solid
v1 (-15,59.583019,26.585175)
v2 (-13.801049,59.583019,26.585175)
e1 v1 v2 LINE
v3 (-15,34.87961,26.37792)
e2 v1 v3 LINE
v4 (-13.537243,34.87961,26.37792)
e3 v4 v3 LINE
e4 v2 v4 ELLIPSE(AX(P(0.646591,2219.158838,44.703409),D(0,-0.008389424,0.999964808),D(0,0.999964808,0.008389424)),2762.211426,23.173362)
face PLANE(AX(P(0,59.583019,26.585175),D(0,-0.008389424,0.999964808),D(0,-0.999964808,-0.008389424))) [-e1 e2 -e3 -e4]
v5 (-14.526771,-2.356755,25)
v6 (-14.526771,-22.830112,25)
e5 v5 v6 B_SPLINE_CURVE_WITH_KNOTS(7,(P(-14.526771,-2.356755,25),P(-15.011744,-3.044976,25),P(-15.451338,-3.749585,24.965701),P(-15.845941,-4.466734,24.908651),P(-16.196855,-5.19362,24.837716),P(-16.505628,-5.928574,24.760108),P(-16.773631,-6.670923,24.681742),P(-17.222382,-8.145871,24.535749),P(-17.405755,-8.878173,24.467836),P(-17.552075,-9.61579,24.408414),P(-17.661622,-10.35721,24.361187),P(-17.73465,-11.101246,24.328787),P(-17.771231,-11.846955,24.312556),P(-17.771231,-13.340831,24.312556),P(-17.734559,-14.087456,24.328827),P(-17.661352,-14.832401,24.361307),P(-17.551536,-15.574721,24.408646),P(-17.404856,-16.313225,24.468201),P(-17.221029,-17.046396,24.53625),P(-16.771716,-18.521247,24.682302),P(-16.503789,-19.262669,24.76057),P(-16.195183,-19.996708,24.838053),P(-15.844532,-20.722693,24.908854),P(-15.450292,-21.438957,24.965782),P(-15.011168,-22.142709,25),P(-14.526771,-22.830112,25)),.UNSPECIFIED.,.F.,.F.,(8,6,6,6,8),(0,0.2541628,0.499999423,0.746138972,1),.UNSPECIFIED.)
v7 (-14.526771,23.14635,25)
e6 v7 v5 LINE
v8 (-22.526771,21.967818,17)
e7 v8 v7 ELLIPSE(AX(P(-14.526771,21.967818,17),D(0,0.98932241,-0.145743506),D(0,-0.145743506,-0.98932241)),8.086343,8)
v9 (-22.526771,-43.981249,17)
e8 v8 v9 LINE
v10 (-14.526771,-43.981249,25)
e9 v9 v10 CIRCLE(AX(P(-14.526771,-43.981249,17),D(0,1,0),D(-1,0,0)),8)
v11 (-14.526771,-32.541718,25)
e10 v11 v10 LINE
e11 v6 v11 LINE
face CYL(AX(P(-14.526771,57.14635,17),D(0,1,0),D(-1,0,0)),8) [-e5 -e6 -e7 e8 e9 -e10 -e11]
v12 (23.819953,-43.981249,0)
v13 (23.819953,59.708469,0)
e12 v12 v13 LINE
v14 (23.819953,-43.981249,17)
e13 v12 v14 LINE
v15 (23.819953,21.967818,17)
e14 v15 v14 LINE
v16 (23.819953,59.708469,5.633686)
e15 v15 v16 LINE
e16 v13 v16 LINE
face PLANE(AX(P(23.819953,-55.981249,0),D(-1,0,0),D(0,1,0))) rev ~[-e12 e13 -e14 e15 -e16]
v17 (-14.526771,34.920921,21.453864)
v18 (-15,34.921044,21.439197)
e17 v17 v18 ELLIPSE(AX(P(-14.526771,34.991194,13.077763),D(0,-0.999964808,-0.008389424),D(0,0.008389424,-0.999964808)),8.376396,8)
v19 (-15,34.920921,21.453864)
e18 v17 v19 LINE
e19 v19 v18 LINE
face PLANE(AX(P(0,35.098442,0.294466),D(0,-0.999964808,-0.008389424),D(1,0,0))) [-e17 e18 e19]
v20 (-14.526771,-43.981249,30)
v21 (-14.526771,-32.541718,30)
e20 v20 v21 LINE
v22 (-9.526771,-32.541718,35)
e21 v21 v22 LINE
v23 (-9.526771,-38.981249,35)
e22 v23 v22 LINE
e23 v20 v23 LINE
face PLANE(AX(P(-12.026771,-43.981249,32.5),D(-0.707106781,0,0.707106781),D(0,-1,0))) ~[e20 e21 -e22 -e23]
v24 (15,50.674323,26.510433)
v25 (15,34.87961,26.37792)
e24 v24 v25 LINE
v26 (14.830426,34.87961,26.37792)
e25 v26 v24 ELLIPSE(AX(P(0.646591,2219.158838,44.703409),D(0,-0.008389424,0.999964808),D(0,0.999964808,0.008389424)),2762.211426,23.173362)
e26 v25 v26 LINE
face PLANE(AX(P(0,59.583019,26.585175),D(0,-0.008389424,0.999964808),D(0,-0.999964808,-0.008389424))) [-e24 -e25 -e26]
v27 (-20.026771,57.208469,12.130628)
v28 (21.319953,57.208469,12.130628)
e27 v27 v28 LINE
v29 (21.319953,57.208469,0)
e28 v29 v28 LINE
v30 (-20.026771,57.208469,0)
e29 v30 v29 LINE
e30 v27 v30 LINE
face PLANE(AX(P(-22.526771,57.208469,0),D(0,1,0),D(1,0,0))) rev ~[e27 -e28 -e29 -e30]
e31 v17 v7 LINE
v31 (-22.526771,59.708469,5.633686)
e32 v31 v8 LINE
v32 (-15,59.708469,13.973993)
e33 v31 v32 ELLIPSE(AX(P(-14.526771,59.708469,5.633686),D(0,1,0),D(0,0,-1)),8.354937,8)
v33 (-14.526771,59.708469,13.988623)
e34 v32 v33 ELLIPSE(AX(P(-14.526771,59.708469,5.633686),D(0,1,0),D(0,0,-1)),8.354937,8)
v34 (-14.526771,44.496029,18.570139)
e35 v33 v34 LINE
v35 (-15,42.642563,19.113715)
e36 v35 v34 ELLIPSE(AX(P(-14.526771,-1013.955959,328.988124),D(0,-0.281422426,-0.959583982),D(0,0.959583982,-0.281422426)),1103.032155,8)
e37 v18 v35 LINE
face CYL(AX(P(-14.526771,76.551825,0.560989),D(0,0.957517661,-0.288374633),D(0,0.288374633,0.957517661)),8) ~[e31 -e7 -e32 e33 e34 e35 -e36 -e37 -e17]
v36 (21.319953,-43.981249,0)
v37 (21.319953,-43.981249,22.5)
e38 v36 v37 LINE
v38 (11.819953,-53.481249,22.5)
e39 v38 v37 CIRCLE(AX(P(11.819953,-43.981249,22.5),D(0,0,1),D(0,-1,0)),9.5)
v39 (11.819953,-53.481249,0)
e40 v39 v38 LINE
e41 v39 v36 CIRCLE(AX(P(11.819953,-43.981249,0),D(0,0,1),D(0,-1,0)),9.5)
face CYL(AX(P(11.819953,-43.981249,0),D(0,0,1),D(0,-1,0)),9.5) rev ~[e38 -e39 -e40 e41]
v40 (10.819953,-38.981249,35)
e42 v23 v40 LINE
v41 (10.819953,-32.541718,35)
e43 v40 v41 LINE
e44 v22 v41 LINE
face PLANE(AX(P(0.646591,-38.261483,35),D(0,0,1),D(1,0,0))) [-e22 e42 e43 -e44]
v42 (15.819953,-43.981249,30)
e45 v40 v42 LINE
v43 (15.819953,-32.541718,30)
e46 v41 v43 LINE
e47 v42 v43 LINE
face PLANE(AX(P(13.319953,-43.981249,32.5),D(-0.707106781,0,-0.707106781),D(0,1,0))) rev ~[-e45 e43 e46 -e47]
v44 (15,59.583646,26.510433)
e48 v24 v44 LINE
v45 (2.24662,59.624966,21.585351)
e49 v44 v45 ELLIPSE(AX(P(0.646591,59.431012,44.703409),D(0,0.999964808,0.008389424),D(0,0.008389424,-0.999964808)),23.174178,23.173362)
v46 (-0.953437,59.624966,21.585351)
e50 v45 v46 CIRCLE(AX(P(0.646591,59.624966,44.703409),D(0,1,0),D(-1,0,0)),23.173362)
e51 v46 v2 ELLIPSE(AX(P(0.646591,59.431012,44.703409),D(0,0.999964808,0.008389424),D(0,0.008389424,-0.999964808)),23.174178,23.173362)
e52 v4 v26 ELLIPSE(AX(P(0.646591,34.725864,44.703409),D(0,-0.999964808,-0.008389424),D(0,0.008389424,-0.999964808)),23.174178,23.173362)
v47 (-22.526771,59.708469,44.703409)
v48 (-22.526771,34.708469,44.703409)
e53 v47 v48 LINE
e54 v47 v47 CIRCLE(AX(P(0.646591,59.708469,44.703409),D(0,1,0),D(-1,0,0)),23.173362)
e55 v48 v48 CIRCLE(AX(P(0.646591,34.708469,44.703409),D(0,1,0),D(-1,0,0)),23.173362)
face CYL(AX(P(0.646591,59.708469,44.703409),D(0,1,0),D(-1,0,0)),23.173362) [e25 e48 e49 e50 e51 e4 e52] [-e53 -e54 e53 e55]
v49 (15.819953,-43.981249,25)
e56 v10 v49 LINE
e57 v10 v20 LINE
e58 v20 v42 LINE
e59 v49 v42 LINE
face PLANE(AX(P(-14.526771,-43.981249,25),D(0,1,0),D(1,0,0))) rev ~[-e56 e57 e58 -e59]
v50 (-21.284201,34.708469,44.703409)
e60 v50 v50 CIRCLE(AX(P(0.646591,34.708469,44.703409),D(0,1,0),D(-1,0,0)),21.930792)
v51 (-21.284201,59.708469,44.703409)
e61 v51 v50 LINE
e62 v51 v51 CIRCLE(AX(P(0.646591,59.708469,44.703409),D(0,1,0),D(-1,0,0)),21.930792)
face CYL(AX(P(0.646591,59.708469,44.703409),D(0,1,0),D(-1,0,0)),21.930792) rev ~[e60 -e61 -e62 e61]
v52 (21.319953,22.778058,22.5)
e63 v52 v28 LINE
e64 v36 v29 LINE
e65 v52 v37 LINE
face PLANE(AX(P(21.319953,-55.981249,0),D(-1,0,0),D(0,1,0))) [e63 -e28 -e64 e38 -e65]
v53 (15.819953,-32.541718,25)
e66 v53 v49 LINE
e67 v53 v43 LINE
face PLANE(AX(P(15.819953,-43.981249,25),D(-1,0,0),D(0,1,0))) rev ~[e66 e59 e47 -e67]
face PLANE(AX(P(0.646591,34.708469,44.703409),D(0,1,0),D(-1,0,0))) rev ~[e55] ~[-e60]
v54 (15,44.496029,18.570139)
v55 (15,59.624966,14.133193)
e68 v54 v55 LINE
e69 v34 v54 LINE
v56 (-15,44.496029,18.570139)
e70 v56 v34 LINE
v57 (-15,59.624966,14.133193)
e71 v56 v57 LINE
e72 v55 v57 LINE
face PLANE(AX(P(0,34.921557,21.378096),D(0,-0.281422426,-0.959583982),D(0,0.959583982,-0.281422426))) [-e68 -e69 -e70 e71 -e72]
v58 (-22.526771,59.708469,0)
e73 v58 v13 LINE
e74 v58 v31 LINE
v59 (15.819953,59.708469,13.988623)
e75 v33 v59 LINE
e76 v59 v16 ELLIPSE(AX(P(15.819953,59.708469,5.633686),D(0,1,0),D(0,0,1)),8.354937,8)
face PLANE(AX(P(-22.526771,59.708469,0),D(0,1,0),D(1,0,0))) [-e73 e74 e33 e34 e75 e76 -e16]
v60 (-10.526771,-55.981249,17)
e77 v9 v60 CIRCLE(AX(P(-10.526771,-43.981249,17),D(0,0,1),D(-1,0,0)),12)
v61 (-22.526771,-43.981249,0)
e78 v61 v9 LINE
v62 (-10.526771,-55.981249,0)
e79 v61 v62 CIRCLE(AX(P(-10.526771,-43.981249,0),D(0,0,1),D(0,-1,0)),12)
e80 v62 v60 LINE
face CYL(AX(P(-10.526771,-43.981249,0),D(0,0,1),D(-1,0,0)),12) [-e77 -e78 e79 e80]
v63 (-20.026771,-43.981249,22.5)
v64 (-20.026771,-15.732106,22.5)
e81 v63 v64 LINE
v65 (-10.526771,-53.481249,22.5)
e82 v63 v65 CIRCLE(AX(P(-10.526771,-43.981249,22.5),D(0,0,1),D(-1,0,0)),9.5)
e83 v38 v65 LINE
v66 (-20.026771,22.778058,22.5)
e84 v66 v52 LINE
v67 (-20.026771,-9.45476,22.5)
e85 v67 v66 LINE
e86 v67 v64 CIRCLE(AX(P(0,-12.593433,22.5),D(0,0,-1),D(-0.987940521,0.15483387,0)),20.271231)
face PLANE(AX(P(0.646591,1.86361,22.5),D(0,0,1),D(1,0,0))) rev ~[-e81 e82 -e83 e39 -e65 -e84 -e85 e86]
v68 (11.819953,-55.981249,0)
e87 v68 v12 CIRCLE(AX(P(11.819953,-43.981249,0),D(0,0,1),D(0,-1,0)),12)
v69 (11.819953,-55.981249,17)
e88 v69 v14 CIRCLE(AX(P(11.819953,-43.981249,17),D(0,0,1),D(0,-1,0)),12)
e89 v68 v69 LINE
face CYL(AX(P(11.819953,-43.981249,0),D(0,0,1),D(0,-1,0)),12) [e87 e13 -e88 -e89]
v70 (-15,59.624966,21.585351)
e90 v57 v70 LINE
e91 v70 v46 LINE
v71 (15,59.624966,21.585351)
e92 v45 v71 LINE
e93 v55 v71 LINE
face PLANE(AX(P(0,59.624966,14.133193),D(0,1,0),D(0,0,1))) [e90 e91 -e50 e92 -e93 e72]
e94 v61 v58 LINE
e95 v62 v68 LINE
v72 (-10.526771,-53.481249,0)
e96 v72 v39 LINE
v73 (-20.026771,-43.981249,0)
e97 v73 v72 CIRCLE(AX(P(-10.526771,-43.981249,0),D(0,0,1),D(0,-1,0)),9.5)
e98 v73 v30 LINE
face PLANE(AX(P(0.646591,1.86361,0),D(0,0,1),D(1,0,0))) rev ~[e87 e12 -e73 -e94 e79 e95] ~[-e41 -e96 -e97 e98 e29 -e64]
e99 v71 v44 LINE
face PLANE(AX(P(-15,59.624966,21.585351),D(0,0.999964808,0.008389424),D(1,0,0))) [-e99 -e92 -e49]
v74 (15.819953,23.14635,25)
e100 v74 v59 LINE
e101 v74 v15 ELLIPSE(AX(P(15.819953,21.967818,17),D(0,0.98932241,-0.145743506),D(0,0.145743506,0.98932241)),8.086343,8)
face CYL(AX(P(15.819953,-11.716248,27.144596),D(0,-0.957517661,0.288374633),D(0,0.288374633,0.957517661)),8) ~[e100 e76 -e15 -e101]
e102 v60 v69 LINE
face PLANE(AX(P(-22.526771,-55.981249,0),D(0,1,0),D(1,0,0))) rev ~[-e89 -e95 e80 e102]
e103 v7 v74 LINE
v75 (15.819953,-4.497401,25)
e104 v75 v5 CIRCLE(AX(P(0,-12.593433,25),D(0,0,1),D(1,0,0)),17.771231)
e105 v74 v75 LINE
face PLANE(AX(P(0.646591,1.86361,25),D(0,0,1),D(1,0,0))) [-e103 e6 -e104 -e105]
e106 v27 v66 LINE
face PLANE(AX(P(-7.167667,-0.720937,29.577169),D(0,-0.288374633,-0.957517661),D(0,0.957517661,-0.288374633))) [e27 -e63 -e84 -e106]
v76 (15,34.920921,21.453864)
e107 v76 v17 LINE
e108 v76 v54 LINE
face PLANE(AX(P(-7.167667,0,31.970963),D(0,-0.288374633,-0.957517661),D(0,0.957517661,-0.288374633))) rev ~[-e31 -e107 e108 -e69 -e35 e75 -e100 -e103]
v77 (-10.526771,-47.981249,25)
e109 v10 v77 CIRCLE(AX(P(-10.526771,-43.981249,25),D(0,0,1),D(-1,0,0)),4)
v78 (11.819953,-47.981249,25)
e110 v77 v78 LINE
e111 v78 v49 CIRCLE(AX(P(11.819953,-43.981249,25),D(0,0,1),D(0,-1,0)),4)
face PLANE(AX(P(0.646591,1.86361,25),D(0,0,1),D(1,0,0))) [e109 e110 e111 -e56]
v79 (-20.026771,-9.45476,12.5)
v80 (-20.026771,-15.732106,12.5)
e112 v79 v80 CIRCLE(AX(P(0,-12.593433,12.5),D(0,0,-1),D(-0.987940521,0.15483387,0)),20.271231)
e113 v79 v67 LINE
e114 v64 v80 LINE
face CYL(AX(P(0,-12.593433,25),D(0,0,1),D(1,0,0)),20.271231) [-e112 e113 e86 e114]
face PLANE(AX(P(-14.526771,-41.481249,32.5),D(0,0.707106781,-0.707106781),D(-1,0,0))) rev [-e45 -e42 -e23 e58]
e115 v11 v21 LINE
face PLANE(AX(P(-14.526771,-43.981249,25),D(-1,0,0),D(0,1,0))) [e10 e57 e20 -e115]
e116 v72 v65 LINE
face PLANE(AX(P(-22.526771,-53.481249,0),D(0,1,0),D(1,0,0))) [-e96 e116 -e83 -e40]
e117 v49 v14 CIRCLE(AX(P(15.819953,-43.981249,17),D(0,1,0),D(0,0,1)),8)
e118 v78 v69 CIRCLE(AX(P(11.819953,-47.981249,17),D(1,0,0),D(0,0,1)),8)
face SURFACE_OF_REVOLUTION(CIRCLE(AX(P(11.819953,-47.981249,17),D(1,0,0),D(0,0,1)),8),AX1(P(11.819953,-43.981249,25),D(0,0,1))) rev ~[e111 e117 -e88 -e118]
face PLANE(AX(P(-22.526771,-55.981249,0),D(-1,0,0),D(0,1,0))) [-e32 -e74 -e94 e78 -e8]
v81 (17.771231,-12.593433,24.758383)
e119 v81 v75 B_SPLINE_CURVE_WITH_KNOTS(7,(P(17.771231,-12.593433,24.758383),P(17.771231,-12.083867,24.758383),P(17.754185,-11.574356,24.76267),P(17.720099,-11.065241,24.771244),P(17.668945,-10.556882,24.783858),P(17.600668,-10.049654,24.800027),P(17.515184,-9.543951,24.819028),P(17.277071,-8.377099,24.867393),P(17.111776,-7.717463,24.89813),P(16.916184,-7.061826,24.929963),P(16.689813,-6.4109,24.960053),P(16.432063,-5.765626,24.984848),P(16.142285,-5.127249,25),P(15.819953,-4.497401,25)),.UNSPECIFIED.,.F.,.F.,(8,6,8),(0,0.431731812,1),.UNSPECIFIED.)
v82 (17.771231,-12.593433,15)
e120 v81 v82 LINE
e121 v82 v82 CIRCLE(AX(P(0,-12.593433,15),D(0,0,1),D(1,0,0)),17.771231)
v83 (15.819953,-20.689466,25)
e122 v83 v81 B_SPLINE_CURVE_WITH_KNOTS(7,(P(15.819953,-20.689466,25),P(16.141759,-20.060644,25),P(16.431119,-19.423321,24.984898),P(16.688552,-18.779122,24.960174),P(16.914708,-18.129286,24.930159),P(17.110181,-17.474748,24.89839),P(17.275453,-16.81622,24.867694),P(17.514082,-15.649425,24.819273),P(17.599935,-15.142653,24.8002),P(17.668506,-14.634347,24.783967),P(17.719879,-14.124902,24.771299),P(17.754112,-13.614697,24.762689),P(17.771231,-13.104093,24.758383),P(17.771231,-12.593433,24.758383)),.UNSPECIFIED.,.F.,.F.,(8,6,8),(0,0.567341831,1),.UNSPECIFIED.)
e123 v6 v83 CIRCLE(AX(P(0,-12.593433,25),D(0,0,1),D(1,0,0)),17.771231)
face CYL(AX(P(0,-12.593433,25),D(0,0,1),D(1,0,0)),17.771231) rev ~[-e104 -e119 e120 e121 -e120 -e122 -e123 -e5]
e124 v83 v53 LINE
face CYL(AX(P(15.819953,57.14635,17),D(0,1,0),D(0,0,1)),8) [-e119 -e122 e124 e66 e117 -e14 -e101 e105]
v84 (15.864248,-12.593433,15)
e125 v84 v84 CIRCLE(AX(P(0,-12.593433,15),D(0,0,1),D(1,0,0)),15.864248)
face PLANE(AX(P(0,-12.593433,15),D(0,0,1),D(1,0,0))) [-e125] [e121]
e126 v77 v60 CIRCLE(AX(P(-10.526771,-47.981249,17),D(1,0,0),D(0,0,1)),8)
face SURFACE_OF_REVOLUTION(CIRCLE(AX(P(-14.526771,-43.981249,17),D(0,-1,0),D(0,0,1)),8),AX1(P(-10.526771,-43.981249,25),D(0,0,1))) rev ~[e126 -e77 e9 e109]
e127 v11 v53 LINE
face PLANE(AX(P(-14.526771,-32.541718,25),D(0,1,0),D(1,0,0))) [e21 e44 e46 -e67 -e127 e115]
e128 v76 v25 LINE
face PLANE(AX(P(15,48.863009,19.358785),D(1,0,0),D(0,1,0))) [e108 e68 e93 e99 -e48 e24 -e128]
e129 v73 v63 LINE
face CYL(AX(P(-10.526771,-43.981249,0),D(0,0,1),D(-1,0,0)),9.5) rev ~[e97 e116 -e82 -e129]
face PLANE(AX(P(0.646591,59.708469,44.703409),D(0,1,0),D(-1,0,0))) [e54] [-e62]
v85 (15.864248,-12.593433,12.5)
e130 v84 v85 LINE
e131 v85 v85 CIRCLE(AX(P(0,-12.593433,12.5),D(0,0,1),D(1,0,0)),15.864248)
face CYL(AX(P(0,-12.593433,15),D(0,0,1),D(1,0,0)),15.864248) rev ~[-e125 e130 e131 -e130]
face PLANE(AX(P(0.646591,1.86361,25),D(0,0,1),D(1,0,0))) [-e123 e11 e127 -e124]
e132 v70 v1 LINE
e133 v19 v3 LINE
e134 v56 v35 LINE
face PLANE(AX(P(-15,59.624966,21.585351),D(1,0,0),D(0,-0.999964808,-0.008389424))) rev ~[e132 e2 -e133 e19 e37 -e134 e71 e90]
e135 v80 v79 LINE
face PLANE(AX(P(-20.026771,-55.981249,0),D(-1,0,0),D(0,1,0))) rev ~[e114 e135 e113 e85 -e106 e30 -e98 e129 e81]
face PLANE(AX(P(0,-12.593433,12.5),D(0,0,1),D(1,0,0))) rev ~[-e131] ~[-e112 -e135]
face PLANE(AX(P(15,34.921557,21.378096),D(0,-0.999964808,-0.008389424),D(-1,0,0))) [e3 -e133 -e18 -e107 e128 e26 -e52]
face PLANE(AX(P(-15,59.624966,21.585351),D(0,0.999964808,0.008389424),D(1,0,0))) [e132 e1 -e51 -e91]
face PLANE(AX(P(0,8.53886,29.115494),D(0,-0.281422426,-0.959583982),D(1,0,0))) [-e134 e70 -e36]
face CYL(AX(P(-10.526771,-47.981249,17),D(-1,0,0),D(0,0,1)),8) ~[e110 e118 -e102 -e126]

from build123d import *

# Parameters (mm, degrees)
F0_W           = 46.3467240334
F0_H           = 115.6897172332
F1_DEPTH       = 25
F2_R           = 12
F4_DEPTH       = 40
F4_DEPTH_BACK  = 40
F6_R           = 17.7712313218
F7_DEPTH       = 10
F8_R           = 23.1733620167
F9_DEPTH       = 25
F11_R          = 21.9307918762
F12_DEPTH      = 25
F14_DEPTH      = 15
F14_DEPTH_BACK = 15
F15_T          = 2.5
F16_R          = 15.8642477534
F17_DEPTH      = 25
F18_DEPTH      = 5
F19_DEPTH      = 25
F20_T1_DEPTH   = 101.1275982577
F20_T3_DEPTH   = 92.184276345
F20_T5_DEPTH   = 22.3467240334
F20_T8_ANGLE   = 90
F20_T12_DEPTH  = 92.184276345
F20_T17_DEPTH  = 92.184276345
F20_T22_DEPTH  = 92.184276345
F20_T27_DEPTH  = 101.1275982577
F20_T30_ANGLE  = 90
F21_W          = 30.3467240334
F21_H          = 11.4395302832
F22_DEPTH      = 10
F23_SIZE       = 5


# Not quite as in the source:
# - a fillet or chamfer that OpenCascade refuses, or shapes differently, is made with other operations: its cross-section is extruded or revolved along the edge and cut away or added
# - a shell that OpenCascade refuses in one call is made with other operations: the cavity is built on its own and cut out


with BuildPart() as f1:
    # F0 (on Top) → F1 (new body)
    with BuildSketch(Plane.XY):
        with Locations((7.814258337, 1.8636099994)):
            Rectangle(F0_W, F0_H)
    extrude(amount=F1_DEPTH)

    # F2
    f2_edges = [f1.edges().sort_by_distance(p)[0] for p in [
        (30.98762, -55.981249, 12.5),
        (-15.359104, -55.981249, 12.5),
    ]]
    fillet(f2_edges, radius=F2_R)

    # F3 (on Right) → F4 (cut, two sides)
    with BuildSketch(Plane.YZ) as f4_sk:
        Polygon((0, 31.970962882), (68.2880878448, 11.4047080278), (67.6364898682, 28.4685865045), align=None)
    extrude(amount=F4_DEPTH, mode=Mode.SUBTRACT)
    extrude(f4_sk.sketch, amount=-F4_DEPTH_BACK, mode=Mode.SUBTRACT)


with BuildPart() as f1_1:
    # F5: moved
    add(f1.part.moved(Location((-7.1676671505, 0, 0))))

    # F6 (on face) → F7 (cut)
    with BuildSketch(Plane.XY.offset(25)):
        with Locations((0, -12.5934332609)):
            Circle(F6_R)
    extrude(amount=-F7_DEPTH, mode=Mode.SUBTRACT)

    # F15: shell of thickness 2.5, made by hand


with BuildPart() as f9:
    # F8 (on face) → F9 (new body)
    with BuildSketch(Plane(origin=(0, 59.708468616, 0), x_dir=(-1, 0, 0), z_dir=(0, 1, 0))):
        with Locations((-0.6465911865, 33.9257717133)):
            Circle(F8_R)
    extrude(amount=-F9_DEPTH)


with BuildPart() as f9_1:
    # F10: moved
    add(f9.part.moved(Location((0, 0, 10.7776373625))))

    # F11 (on face) → F12 (cut)
    with BuildSketch(Plane(origin=(0, 59.708468616, 0), x_dir=(-1, 0, 0), z_dir=(0, 1, 0))):
        with Locations((-0.6465911865, 44.7034090757)):
            Circle(F11_R)
    extrude(amount=-F12_DEPTH, mode=Mode.SUBTRACT)


with BuildPart() as f14:
    # F13 (on Right) → F14 (new body, two sides)
    with BuildSketch(Plane.YZ) as f14_sk:
        Polygon((59.624966234, 14.1331925988), (59.624966234, 21.5853508562), (34.9215567112, 21.3780961931), align=None)
    extrude(amount=F14_DEPTH)
    extrude(f14_sk.sketch, amount=-F14_DEPTH_BACK)


with BuildPart() as f15_core1:
    # F15_t2: copy of F1
    add(f1_1.part)

    # the walls: a layer under each face that stays
    f15_faces = [f15_core1.faces().sort_by_distance(p)[0] for p in [
        (-22.5267708302, 7.8636099994, 12.5),
        (-19.0120522044, -52.4665299914, 12.5),
        (-14.8023168246, -42.7933155742, 25),
        (0.6465911865, 41.4274091283, 19.4943116685),
        (0.6465911865, 59.708468616, 6.9943116685),
        (0.6465911865, -55.9812486172, 12.5),
        (23.8199532032, 7.8636099994, 12.5),
        (20.3052345774, -52.4665299914, 12.5),
        (-17.7712313218, -12.5934332609, 20),
        (0, -12.5934332609, 15),
    ]]
    thicken(f15_faces, amount=-F15_T, mode=Mode.SUBTRACT)

    # F15_s3 → F15_t4 (revolve, cut)
    with BuildSketch(Plane.XZ.offset(12.5934332609)):
        Polygon((17.7462313218, 15.025), (20.2712313218, 15), (20.2712313218, 12.5), (17.7712313218, 12.5), align=None)
    revolve(axis=Axis((0, -12.5934332609, 15), (0, 0, 1)), mode=Mode.SUBTRACT)


with BuildPart() as f1_2:
    add(f1_1.part)

    # what is left inside the walls is the cavity
    f15_cavity = [f15_core1.part.solids().sort_by_distance(p)[0] for p in [
        (0.646591, -16.584676, 0.025),
    ]]
    add(f15_cavity, mode=Mode.SUBTRACT)

    # F16 (on face) → F17 (cut)
    with BuildSketch(Plane.XY.offset(15)):
        with Locations((0, -12.5934332609)):
            Circle(F16_R)
    extrude(amount=-F17_DEPTH, mode=Mode.SUBTRACT)

    # F18 (add): a face of the model
    f18_faces = [f14.part.faces().sort_by_distance(p)[0] for p in [
        (0, 47.2732614726, 21.4817235246),
    ]]

    add(f9_1.part)  # F18 merges F9

    add(f14.part)  # F18 merges F14
    extrude(f18_faces, amount=F18_DEPTH)

    # F11 (on face) → F19 (cut)
    with BuildSketch(Plane(origin=(0, 59.708468616, 0), x_dir=(-1, 0, 0), z_dir=(0, 1, 0))):
        with Locations((-0.6465911865, 44.7034090757)):
            Circle(F11_R)
    extrude(amount=-F19_DEPTH, mode=Mode.SUBTRACT)

    # F20: fillet of radius 8 on 7 edges, made by hand

    # F20_s2 → F20_t1 (cut)
    with BuildSketch(Plane.XZ.offset(-57.1463496406)):
        with BuildLine():
            ThreePointArc((15.8199532032, 25), (21.4768074527, 22.6568542495), (23.8199532032, 17))
            Line((23.8199532032, 17), (23.8199532032, 25))
            Line((23.8199532032, 25), (15.8199532032, 25))
        make_face()
    extrude(amount=F20_T1_DEPTH, mode=Mode.SUBTRACT)

    # F20_s4 → F20_t3 (cut)
    with BuildSketch(Plane(origin=(0, -18.2371947161, 5.4924776223), x_dir=(1, 0, 0), z_dir=(0, 0.9575176611, -0.2883746326))):
        with BuildLine():
            ThreePointArc((15.8199532032, -30.6127616009), (21.4768074527, -28.2696158504), (23.8199532032, -22.6127616009))
            Line((23.8199532032, -22.6127616009), (23.8199532032, -30.6127616009))
            Line((23.8199532032, -30.6127616009), (15.8199532032, -30.6127616009))
        make_face()
    extrude(amount=F20_T3_DEPTH, mode=Mode.SUBTRACT)

    # F20_s6 → F20_t5 (cut)
    with BuildSketch(Plane.YZ.offset(-10.5267708302)):
        with BuildLine():
            ThreePointArc((-47.9812486172, 25), (-53.6381028667, 22.6568542495), (-55.9812486172, 17))
            Line((-55.9812486172, 17), (-55.9812486172, 25))
            Line((-55.9812486172, 25), (-47.9812486172, 25))
        make_face()
    extrude(amount=F20_T5_DEPTH, mode=Mode.SUBTRACT)

    # F20_s7 → F20_t8 (revolve, cut)
    with BuildSketch(Plane.YZ.offset(11.8199532032)):
        with BuildLine():
            ThreePointArc((-47.9812486172, 25), (-53.6381028667, 22.6568542495), (-55.9812486172, 17))
            Line((-55.9812486172, 17), (-55.9812486172, 25))
            Line((-55.9812486172, 25), (-47.9812486172, 25))
        make_face()
    revolve(axis=Axis((11.8199532032, -43.9812486172, 25), (0, 0, 1)), revolution_arc=F20_T8_ANGLE, mode=Mode.SUBTRACT)


with BuildPart() as f20_tool10:
    # F20_s11 → F20_t12 (new body)
    with BuildSketch(Plane(origin=(0, 70.0308779571, -21.0911292025), x_dir=(1, 0, 0), z_dir=(0, -0.9575176611, 0.2883746326))):
        with BuildLine():
            ThreePointArc((-14.5267708302, 30.6127616009), (-20.1836250796, 28.2696158504), (-22.5267708302, 22.6127616009))
            Line((-22.5267708302, 22.6127616009), (-22.5267708302, 30.6127616009))
            Line((-22.5267708302, 30.6127616009), (-14.5267708302, 30.6127616009))
        make_face()
    extrude(amount=F20_T12_DEPTH)

    split(bisect_by=Plane(origin=(0, 8.5388595544, 29.1154936273), x_dir=(1, 0, 0), z_dir=(0, -0.281422426, -0.9595839818)), keep=Keep.TOP)


with BuildPart() as f1_3:
    add(f1_2.part)

    # F20_t9: cut F20_tool10
    add(f20_tool10.part, mode=Mode.SUBTRACT)


with BuildPart() as f20_tool15:
    # F20_s16 → F20_t17 (new body)
    with BuildSketch(Plane(origin=(0, 70.0308779571, -21.0911292025), x_dir=(1, 0, 0), z_dir=(0, -0.9575176611, 0.2883746326))):
        with BuildLine():
            ThreePointArc((-14.5267708302, 30.6127616009), (-20.1836250796, 28.2696158504), (-22.5267708302, 22.6127616009))
            Line((-22.5267708302, 22.6127616009), (-22.5267708302, 30.6127616009))
            Line((-22.5267708302, 30.6127616009), (-14.5267708302, 30.6127616009))
        make_face()
    extrude(amount=F20_T17_DEPTH)

    split(bisect_by=Plane.YZ.offset(-15), keep=Keep.BOTTOM)


with BuildPart() as f1_4:
    add(f1_3.part)

    # F20_t14: cut F20_tool15
    add(f20_tool15.part, mode=Mode.SUBTRACT)


with BuildPart() as f20_tool20:
    # F20_s21 → F20_t22 (new body)
    with BuildSketch(Plane(origin=(0, 70.0308779571, -21.0911292025), x_dir=(1, 0, 0), z_dir=(0, -0.9575176611, 0.2883746326))):
        with BuildLine():
            ThreePointArc((-14.5267708302, 30.6127616009), (-20.1836250796, 28.2696158504), (-22.5267708302, 22.6127616009))
            Line((-22.5267708302, 22.6127616009), (-22.5267708302, 30.6127616009))
            Line((-22.5267708302, 30.6127616009), (-14.5267708302, 30.6127616009))
        make_face()
    extrude(amount=F20_T22_DEPTH)

    split(bisect_by=Plane(origin=(0, 35.0984424425, 0.2944660678), x_dir=(1, 0, 0), z_dir=(0, -0.9999648082, -0.0083894237)), keep=Keep.TOP)


with BuildPart() as f1_5:
    add(f1_4.part)

    # F20_t19: cut F20_tool20
    add(f20_tool20.part, mode=Mode.SUBTRACT)


with BuildPart() as f20_tool25:
    # F20_s26 → F20_t27 (new body)
    with BuildSketch(Plane.XZ.offset(-57.1463496406)):
        with BuildLine():
            ThreePointArc((-22.5267708302, 17), (-20.1836250796, 22.6568542495), (-14.5267708302, 25))
            Line((-14.5267708302, 25), (-22.5267708302, 25))
            Line((-22.5267708302, 25), (-22.5267708302, 17))
        make_face()
    extrude(amount=F20_T27_DEPTH)

    split(bisect_by=Plane(origin=(0, 8.8279438803, 29.312259887), x_dir=(1, 0, 0), z_dir=(0, -0.2883746326, -0.9575176611)), keep=Keep.TOP)


with BuildPart() as f1_6:
    add(f1_5.part)

    # F20_t24: cut F20_tool25
    add(f20_tool25.part, mode=Mode.SUBTRACT)

    # F20_s29 → F20_t30 (revolve, cut)
    with BuildSketch(Plane.XZ.offset(43.9812486172)):
        with BuildLine():
            ThreePointArc((-14.5267708302, 25), (-20.1836250796, 22.6568542495), (-22.5267708302, 17))
            Line((-22.5267708302, 17), (-22.5267708302, 25))
            Line((-22.5267708302, 25), (-14.5267708302, 25))
        make_face()
    revolve(axis=Axis((-10.5267708302, -43.9812486172, 25), (0, 0, 1)), revolution_arc=F20_T30_ANGLE, mode=Mode.SUBTRACT)

    # F21 (on face) → F22 (join)
    with BuildSketch(Plane.XY.offset(25)):
        with Locations((0.6465911865, -38.2614834756)):
            Rectangle(F21_W, F21_H)
    extrude(amount=F22_DEPTH)

    # F23
    f23_edges = [f1_6.edges().sort_by_distance(p)[0] for p in [
        (15.819953, -38.261483, 35),
        (-14.526771, -38.261483, 35),
        (0.646591, -43.981249, 35),
    ]]
    chamfer(f23_edges, length=F23_SIZE)


solid = f1_6.part
